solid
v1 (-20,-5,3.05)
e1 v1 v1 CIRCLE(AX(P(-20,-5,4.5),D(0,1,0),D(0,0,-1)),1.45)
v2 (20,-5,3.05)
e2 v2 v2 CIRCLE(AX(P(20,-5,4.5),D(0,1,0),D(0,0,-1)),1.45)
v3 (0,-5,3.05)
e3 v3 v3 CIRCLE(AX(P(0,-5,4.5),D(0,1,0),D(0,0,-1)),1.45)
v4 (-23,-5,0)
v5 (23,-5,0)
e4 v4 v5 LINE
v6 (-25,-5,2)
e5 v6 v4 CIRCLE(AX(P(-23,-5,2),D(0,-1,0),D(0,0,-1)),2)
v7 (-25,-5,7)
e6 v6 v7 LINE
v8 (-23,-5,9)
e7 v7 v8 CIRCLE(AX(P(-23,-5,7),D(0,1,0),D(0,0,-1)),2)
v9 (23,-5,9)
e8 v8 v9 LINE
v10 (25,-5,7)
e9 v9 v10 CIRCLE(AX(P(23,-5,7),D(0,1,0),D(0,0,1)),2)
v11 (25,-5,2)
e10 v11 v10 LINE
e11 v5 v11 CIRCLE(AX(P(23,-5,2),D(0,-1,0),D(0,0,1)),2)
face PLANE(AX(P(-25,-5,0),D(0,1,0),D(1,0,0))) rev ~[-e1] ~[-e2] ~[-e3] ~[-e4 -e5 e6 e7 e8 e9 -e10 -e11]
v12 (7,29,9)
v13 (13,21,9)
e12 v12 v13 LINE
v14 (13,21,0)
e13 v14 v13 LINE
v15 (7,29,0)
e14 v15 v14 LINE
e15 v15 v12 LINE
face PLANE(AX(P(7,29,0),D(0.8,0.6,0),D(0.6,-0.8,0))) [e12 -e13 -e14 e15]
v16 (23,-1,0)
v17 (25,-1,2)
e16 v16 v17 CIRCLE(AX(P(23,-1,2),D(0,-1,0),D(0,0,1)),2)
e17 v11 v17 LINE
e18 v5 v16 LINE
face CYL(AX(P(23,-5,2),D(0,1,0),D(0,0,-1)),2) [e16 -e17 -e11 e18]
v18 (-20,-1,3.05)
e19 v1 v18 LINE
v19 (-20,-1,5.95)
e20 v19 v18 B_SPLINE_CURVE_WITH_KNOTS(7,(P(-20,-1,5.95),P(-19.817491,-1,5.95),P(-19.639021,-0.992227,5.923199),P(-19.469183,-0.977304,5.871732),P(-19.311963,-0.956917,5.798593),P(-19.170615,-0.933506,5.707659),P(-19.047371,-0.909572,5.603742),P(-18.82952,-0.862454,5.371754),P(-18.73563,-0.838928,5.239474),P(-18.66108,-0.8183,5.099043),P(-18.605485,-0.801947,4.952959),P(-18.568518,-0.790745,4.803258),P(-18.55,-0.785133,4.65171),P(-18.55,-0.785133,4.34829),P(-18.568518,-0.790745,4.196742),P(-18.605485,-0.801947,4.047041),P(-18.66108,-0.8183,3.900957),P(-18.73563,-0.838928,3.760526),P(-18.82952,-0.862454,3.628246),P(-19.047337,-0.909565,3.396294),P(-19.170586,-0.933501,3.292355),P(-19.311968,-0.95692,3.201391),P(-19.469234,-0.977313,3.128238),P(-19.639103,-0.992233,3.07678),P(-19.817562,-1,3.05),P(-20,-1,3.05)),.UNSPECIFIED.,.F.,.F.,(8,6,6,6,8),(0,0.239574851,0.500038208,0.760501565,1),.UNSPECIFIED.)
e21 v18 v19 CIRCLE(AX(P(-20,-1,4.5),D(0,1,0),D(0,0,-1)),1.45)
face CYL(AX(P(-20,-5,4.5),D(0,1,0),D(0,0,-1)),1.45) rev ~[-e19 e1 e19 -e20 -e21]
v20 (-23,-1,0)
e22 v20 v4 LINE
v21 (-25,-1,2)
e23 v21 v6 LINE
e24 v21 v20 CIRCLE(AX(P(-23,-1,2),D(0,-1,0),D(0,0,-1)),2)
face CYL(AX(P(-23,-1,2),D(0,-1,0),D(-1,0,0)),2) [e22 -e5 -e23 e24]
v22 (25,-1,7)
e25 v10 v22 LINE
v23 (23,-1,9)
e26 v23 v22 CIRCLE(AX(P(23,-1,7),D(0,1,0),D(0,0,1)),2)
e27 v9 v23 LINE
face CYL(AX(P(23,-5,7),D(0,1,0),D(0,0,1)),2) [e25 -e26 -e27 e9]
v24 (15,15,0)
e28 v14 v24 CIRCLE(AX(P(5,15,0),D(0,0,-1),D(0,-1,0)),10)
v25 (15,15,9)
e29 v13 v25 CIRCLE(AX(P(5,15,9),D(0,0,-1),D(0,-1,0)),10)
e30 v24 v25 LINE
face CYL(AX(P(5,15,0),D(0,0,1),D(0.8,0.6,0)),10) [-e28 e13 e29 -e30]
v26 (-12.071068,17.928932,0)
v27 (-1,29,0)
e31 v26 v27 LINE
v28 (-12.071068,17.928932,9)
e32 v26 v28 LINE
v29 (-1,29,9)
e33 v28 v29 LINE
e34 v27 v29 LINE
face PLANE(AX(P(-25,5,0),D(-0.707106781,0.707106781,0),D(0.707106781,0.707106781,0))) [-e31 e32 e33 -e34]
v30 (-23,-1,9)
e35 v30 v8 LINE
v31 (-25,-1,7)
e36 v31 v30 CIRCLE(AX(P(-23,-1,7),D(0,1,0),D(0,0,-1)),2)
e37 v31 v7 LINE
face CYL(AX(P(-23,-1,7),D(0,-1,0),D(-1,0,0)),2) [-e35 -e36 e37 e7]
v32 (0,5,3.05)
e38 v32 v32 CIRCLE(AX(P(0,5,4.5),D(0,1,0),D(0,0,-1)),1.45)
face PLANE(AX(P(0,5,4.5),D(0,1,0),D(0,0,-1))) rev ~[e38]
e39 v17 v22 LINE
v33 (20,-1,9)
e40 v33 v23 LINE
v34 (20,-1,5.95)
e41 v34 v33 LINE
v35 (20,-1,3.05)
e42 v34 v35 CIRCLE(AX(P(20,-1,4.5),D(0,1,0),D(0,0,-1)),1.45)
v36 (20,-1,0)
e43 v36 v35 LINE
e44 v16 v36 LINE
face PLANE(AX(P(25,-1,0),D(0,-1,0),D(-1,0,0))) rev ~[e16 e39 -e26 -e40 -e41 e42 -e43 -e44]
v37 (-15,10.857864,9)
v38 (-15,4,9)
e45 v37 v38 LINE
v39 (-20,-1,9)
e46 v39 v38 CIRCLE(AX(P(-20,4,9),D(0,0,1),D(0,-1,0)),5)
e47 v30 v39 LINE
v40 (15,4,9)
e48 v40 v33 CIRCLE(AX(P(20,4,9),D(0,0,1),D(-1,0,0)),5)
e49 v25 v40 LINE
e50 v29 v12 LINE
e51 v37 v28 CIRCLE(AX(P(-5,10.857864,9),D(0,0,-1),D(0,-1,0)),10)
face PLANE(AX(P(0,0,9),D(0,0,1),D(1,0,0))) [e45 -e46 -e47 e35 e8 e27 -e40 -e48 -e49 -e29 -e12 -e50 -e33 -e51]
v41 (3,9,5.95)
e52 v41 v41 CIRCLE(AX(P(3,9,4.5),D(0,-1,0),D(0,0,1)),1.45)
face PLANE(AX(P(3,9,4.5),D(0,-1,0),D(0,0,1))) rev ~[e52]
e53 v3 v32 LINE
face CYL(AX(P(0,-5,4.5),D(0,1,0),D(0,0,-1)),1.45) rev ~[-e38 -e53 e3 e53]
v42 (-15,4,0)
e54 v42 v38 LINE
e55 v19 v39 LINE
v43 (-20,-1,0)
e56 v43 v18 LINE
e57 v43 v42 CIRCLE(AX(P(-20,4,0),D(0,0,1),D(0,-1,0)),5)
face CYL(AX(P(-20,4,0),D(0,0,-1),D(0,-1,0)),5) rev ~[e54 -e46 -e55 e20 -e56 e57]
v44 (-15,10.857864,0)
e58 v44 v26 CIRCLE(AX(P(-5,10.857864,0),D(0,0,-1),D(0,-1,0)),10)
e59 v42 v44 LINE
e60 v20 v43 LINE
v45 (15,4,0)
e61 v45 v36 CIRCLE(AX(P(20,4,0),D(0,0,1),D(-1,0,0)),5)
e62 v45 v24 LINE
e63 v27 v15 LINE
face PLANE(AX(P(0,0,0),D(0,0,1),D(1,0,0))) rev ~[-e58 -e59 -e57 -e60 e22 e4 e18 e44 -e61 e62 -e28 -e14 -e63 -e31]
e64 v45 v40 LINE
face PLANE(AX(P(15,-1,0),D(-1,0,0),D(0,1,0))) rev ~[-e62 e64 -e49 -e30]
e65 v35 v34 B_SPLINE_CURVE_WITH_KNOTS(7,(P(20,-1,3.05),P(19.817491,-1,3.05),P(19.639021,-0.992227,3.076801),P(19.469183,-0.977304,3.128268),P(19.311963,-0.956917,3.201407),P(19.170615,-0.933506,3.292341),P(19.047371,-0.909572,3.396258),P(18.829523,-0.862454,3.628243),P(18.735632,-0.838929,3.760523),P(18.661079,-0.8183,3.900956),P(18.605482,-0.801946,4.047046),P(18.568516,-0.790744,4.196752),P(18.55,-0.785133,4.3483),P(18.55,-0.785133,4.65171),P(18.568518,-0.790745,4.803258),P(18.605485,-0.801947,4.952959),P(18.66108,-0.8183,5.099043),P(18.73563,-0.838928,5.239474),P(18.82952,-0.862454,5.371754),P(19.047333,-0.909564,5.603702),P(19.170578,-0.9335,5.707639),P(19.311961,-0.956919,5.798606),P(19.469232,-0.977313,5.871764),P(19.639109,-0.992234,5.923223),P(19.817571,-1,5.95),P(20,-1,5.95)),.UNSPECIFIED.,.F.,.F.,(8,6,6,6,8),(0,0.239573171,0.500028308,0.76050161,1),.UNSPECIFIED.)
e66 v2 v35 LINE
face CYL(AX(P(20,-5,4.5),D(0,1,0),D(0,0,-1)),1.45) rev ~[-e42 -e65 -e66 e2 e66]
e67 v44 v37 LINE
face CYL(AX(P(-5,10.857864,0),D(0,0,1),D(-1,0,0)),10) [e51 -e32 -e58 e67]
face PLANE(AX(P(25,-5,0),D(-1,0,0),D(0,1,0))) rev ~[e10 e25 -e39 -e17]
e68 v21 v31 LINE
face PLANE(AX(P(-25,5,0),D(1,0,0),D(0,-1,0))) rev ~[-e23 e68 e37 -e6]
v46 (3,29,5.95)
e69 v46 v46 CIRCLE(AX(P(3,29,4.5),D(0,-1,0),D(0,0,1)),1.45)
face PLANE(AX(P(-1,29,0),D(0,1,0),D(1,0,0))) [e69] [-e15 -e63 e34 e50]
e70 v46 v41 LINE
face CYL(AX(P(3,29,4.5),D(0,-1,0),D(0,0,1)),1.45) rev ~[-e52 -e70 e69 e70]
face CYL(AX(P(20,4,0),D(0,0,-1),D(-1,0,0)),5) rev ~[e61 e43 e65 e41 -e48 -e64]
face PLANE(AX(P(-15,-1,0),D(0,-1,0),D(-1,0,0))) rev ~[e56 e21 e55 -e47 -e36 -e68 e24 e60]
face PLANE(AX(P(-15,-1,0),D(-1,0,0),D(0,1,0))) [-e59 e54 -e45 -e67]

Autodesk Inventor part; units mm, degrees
ref_plane "YZ Plane" through (0, 0, 0) normal (1, 0, 0) x (0, 1, 0)
ref_plane "XZ Plane" through (0, 0, 0) normal (0, 1, 0) x (-1, 0, 0)
ref_plane "XY Plane" through (0, 0, 0) normal (0, 0, 1) x (1, 0, 0)
sketch "Sketch1" plane through (0, 0, 0) normal (0, 0, 1) x (1, 0, 0)
  line L0 (-25, -5) -> (25, -5)
  line L1 (25, -5) -> (25, 5)
  line L2 (25, 5) -> (-25, 5)
  line L3 (-25, 5) -> (-25, -5)
  line L4 (-25, -5) -> (25, 5) construction
  line L5 (25, -5) -> (-25, 5) construction
  line L6 (-25, 5) -> (-1, 29)
  line L7 (-1, 29) -> (7, 29)
  line L8 (7, 29) -> (25, 5)
  line L9 (3, 29) -> (3, 5) construction
  point P0 (0, 0)
  dimension "d0" = 28
  dimension "d1" = 50
  dimension "d2" = 34
  dimension "d3" = 8
  dimension "d4" = 10
extrude "Extrusion1" add sketch "Sketch1" along normal blind 9
sketch "Sketch2" plane through (-25, -5, 0) normal (0, -1, 0) x (1, 0, 0)
  line L0 (0, 0) -> (50, 0) projected
  line L1 (50, 0) -> (50, 9) projected
  line L2 (0, 9) -> (50, 9) projected
  line L3 (0, 0) -> (0, 9) projected
  point P0 (25, 0)
  point P1 (5, 4.5)
  point P2 (25, 4.5)
  point P3 (45, 4.5)
  point P4 (50, 4.5)
  dimension "d7" = 20
  dimension "d8" = 20
  dimension "d9" = 5
hole "Hole1" at (20, -5, 4.5) at (-20, -5, 4.5) at (0, -5, 4.5) direction (0, 1, 0) diameter 2.9 depth 10
sketch "Sketch3" plane through (-1, 29, 0) normal (0, 1, 0) x (1, 0, 0)
  line L0 (8, 0) -> (0, 0) projected
  line L1 (0, 0) -> (0, -9) projected
  line L2 (8, -9) -> (0, -9) projected
  line L3 (8, 0) -> (8, -9) projected
  point P0 (1, 0)
  point P1 (4, -4.5)
  point P2 (8, -4.5)
  point P3 (4, 0)
hole "Hole2" at (3, 29, 4.5) direction (0, -1, 0) diameter 2.9 depth 20
sketch "Sketch4" plane through (0, 0, 0) normal (0, 0, -1) x (-1, 0, 0)
  line L0 (-18.55, -5) -> (-21.45, -5) projected
  line L1 (-21.45, 5) -> (-18.55, 5) projected
  line L2 (-25, -5) -> (-25, 5) projected
  line L3 (-25, -1) -> (-15, -1)
  line L4 (-15, -1) -> (-15, 18.3333)
  line L5 (25, -5) -> (-25, -5) projected
  line L6 (-7, 29) -> (1, 29) projected
  line L7 (-25, 5) -> (-7, 29) projected
  line L8 (-25, -5) -> (-25, 5) projected
  line L9 (25, -5) -> (-25, -5) projected
  line L10 (25, 5) -> (25, -5) projected
  line L11 (1, 29) -> (25, 5) projected
  line L12 (21.45, 5) -> (21.45, -5) projected
  line L13 (18.55, 5) -> (18.55, -5) projected
  line L14 (-15, -1) -> (25, -1)
  line L15 (15, -1) -> (15, 15)
  point P0 (0, 0)
  dimension "d25" = 3.55
  dimension "d26" = 4
  dimension "d27" = 3.55
extrude "Extrusion2" cut sketch "Sketch4" against normal through all contours L14 L15 L11 L10 | L2 L7 L4 L3
fillet "Fillet2" radius 5 2 edges at (15, -1, 4.5) (-15, -1, 4.5)
fillet "Fillet3" radius 2 4 edges at (25, -3, 0) (25, -3, 9) (-25, -3, 0) (-25, -3, 9)
fillet "Fillet4" radius 10 2 edges at (-15, 15, 4.5) (15, 18.3333, 4.5)
equation "\"d8\" = d7"
equation "\"d27\" = d25"
properties part number "LeftLevelBlock" material "ABS Plastic"
